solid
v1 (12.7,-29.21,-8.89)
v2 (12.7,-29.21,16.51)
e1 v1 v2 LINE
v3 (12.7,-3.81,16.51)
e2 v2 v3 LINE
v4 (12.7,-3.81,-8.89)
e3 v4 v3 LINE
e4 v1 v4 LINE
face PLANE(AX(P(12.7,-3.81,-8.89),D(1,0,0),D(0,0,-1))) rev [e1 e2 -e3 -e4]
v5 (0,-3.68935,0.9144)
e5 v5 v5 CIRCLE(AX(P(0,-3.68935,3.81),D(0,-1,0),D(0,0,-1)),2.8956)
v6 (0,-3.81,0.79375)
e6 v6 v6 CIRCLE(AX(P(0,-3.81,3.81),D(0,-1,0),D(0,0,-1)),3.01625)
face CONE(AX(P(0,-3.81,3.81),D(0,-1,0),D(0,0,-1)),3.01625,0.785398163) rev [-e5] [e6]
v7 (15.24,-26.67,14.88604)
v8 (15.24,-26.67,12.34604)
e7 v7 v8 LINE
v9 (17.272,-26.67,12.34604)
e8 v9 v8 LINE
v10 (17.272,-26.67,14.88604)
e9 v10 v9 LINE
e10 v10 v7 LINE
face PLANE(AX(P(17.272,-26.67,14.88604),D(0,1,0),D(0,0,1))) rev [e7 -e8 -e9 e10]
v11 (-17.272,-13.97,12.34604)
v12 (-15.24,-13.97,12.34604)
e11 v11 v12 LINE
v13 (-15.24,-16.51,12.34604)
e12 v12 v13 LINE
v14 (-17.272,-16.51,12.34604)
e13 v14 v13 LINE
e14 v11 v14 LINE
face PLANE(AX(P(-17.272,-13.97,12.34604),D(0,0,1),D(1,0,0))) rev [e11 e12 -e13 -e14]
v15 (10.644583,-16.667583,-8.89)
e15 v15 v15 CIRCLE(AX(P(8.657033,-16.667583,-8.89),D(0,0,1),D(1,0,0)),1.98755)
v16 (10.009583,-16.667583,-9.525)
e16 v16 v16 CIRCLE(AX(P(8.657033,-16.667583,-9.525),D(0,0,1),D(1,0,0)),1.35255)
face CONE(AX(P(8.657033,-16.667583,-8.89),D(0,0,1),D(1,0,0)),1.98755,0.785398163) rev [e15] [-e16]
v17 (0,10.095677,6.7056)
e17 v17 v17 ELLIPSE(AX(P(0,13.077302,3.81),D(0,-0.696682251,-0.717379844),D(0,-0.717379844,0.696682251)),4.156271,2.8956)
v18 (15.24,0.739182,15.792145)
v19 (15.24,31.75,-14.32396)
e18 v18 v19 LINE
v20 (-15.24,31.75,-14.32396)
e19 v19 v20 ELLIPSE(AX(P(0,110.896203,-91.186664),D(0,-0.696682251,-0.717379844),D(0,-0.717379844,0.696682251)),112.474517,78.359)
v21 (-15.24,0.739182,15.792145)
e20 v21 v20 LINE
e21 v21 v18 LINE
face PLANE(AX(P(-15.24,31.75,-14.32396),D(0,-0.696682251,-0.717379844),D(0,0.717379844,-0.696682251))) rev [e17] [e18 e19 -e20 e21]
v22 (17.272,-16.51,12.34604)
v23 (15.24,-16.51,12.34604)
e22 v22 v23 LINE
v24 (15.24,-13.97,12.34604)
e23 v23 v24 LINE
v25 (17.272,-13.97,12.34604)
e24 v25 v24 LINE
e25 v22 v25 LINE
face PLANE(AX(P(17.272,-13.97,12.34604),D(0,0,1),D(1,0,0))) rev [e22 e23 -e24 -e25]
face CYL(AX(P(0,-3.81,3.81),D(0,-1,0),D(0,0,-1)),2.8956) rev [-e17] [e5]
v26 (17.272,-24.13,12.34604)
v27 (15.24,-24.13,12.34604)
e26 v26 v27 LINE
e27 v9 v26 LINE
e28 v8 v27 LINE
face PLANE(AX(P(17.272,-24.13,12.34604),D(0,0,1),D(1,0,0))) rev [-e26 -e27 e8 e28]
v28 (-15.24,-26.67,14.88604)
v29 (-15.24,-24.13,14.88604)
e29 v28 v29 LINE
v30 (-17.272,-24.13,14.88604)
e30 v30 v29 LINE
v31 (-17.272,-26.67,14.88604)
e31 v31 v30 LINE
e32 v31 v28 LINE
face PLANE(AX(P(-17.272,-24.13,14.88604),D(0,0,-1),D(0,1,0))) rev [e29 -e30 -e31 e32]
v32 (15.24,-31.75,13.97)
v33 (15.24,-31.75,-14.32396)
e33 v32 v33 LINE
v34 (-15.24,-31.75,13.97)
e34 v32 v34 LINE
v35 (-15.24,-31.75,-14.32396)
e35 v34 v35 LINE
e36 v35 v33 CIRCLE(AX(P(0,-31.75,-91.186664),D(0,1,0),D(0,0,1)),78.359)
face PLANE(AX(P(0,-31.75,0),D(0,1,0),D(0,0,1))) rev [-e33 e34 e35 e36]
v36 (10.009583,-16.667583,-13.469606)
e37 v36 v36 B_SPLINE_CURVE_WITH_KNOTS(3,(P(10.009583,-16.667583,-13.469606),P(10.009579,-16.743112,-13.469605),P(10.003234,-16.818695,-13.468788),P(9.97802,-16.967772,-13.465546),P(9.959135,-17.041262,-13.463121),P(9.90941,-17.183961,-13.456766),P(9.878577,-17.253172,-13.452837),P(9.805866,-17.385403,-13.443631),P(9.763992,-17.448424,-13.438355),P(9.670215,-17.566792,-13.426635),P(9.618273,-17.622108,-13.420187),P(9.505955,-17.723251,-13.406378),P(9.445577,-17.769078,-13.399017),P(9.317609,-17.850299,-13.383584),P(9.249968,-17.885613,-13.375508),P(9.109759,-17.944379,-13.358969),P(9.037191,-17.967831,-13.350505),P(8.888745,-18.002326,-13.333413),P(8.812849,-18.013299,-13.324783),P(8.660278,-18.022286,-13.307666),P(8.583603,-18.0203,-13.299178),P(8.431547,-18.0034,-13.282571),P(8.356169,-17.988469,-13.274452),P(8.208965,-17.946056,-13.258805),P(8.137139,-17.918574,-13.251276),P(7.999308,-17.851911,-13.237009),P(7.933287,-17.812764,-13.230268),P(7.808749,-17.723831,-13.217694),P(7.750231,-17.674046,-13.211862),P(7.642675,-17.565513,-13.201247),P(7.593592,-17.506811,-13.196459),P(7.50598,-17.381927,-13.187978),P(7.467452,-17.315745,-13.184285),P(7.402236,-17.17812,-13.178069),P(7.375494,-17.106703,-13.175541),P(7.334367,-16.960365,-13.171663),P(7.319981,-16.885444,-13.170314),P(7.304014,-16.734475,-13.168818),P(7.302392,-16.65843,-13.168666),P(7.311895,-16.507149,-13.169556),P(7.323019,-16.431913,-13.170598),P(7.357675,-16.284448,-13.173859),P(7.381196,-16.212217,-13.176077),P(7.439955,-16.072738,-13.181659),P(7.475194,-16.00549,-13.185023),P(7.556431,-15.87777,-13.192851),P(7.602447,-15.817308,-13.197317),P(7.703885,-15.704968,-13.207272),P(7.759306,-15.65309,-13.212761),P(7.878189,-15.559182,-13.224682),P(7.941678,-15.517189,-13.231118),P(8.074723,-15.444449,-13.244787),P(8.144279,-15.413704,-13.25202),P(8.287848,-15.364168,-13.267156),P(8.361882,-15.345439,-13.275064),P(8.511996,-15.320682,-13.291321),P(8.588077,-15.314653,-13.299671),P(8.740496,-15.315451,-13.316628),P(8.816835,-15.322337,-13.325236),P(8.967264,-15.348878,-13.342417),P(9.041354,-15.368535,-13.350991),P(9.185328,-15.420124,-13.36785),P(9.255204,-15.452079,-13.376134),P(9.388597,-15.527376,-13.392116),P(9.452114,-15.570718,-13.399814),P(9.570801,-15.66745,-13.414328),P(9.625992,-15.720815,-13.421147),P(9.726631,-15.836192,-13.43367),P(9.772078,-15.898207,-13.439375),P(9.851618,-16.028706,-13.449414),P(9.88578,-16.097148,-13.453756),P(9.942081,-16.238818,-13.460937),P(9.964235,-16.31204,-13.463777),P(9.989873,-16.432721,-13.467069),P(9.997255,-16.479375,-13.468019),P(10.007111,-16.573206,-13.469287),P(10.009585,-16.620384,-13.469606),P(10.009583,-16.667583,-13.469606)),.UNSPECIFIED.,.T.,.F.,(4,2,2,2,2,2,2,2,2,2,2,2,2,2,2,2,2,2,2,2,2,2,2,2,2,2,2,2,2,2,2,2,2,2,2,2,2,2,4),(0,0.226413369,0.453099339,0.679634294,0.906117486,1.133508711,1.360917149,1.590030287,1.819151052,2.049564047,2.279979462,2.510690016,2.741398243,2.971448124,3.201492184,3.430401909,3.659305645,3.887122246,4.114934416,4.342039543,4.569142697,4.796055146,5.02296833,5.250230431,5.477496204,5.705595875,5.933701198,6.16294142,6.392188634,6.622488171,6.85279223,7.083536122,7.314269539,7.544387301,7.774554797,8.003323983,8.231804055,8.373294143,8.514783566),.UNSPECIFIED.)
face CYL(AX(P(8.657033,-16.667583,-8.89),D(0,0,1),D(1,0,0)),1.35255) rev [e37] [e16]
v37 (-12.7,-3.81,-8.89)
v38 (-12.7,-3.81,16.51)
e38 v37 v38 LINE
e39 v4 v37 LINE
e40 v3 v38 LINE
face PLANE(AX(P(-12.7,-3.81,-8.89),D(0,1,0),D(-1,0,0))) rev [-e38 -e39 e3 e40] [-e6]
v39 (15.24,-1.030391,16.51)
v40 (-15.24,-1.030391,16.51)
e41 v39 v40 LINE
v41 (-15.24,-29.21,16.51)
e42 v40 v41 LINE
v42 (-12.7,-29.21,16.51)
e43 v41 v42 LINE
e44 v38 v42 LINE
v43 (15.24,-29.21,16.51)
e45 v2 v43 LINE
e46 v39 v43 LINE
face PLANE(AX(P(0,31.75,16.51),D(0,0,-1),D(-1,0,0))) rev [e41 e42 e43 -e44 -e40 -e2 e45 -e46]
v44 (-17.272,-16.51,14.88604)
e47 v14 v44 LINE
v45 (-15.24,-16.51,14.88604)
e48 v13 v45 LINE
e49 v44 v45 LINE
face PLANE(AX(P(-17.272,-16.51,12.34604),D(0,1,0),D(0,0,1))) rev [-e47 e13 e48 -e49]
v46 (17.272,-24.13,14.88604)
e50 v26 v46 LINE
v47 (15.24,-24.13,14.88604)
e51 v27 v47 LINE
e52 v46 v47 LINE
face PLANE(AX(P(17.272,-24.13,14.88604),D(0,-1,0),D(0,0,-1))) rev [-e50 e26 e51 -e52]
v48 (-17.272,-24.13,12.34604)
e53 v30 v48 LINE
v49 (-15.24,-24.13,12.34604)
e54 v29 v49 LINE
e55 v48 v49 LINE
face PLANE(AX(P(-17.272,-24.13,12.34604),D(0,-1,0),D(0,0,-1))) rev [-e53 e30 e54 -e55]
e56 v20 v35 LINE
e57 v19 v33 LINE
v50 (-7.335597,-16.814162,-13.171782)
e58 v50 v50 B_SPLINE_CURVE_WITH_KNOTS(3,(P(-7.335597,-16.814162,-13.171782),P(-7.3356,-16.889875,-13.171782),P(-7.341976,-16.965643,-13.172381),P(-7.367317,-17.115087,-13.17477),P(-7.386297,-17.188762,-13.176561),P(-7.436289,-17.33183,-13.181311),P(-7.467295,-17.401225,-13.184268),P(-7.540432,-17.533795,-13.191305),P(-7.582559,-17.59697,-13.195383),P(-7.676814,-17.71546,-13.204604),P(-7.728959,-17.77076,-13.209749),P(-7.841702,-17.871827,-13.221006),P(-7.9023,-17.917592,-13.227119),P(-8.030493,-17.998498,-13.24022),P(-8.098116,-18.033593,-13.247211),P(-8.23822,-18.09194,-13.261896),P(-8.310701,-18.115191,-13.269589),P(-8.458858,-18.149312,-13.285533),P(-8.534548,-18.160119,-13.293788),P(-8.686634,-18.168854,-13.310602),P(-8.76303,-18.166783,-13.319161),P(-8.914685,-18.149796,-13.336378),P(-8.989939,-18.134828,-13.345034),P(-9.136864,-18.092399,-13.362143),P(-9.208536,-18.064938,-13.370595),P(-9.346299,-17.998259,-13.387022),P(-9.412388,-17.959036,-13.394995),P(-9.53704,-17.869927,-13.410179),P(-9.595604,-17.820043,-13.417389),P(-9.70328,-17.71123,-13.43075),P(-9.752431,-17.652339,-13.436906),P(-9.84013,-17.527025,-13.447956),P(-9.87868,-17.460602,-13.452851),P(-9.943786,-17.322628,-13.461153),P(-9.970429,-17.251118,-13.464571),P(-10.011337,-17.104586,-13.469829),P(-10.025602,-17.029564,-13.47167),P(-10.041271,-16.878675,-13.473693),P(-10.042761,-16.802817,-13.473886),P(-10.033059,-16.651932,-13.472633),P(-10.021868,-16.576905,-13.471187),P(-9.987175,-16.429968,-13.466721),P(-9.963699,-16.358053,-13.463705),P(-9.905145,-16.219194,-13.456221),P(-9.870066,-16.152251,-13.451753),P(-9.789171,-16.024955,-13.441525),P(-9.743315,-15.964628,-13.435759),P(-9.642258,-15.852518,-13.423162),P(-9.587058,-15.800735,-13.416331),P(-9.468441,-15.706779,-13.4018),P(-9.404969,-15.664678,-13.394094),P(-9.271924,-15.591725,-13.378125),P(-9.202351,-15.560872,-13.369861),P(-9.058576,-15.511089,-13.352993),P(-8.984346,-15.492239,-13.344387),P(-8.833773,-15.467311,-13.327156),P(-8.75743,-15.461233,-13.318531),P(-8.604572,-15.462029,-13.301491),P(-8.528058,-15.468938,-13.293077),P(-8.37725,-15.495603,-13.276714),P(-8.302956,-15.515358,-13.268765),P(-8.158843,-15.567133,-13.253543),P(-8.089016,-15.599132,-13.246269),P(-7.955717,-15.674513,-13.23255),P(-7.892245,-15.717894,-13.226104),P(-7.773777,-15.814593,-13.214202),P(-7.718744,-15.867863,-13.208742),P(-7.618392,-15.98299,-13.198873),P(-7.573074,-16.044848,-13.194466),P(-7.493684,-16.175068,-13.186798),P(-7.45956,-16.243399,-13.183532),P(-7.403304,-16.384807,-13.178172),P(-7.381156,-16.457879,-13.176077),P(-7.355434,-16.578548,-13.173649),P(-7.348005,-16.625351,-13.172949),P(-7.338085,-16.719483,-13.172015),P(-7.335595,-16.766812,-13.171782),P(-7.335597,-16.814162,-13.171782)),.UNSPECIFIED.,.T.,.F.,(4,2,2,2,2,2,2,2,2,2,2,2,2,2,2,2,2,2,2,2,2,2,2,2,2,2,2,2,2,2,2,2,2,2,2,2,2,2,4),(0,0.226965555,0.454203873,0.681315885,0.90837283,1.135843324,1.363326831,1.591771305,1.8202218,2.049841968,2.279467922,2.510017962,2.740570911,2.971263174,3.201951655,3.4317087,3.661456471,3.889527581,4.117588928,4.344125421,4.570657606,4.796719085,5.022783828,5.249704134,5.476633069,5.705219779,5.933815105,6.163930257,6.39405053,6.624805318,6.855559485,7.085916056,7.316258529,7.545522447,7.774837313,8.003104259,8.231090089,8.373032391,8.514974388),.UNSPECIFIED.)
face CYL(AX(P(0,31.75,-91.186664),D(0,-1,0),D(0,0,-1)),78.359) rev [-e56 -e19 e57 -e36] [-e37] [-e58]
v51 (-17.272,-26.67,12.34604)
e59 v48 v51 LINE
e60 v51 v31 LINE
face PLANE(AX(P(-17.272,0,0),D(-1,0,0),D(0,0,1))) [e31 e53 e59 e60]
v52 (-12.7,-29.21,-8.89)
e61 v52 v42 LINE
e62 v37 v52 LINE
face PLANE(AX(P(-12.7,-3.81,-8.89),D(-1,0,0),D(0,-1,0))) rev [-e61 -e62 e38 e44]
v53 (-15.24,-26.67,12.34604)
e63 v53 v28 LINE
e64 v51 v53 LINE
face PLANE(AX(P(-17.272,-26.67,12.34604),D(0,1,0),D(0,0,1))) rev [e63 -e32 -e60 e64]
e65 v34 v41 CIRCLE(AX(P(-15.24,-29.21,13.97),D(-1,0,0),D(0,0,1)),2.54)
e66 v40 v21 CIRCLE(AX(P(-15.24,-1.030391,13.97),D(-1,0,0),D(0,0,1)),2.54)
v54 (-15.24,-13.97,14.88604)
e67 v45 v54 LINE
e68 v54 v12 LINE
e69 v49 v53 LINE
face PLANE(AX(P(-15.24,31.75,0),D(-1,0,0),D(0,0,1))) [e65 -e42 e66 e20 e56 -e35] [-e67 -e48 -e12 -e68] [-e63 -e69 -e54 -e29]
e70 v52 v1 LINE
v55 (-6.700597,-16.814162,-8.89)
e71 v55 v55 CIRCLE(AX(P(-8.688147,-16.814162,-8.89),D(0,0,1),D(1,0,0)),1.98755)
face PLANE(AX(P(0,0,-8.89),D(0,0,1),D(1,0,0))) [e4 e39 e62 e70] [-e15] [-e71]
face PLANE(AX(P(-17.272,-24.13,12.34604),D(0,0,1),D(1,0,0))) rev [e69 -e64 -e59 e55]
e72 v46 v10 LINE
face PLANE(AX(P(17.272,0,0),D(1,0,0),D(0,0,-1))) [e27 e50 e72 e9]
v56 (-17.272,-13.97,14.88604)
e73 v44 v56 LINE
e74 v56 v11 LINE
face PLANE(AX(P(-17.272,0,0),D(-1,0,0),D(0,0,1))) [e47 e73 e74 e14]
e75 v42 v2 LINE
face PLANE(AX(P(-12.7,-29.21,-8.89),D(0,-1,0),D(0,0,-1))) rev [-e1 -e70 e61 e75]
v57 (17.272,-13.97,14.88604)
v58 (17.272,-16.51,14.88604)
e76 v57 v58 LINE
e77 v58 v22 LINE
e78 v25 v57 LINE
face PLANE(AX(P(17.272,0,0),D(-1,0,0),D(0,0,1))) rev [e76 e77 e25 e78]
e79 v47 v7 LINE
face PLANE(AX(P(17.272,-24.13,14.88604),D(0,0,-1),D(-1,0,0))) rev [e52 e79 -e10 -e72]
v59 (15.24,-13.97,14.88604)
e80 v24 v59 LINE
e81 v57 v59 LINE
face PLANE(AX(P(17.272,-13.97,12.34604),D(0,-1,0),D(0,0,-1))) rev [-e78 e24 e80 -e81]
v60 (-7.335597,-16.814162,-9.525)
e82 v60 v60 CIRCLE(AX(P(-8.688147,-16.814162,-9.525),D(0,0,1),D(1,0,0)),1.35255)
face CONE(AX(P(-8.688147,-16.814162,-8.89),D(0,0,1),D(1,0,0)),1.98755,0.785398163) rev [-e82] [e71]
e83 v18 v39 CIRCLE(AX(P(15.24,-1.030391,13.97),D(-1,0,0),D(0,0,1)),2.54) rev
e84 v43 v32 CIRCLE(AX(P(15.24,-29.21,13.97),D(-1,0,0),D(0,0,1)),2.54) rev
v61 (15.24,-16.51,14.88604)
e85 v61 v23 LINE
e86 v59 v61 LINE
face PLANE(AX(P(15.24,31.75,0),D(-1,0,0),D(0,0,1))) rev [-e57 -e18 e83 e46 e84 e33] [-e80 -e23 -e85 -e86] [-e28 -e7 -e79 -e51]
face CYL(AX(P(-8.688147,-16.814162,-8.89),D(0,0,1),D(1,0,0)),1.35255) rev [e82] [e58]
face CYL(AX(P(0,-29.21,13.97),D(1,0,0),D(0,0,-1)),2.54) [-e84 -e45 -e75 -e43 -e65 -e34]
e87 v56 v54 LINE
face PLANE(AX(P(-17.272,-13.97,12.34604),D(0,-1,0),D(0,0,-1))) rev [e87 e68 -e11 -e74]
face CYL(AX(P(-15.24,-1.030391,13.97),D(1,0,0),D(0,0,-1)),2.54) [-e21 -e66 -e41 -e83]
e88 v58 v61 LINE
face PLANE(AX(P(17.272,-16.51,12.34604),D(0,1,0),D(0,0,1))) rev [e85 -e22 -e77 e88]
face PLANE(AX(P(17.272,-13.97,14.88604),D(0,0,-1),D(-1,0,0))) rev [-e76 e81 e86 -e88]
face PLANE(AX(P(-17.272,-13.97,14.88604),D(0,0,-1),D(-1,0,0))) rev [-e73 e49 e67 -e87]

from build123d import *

# Parameters (mm, degrees)
BOSS_EXTRUDE1_DEPTH                 = 31.75
SKETCH3_W                           = 25.4
SKETCH3_H                           = 25.4
CUT_EXTRUDE1_DEPTH                  = 25.4
CUT_EXTRUDE2_DEPTH                  = 30.48
SKETCH5_W                           = 2.54
SKETCH5_H                           = 2.54
BOSS_EXTRUDE2_DEPTH                 = 2.032
SKETCH7_W                           = 2.54
SKETCH7_H                           = 2.54
BOSS_EXTRUDE3_DEPTH                 = 2.032
FILLET1_R                           = 2.54
FILLET2_R                           = 2.54
TAP_DRILL_FOR_6_32_TAP1_D           = 2.7051
TAP_DRILL_FOR_6_32_TAP1_CSINK_D     = 3.9751
TAP_DRILL_FOR_6_32_TAP1_CSINK_ANGLE = 90
TAP_DRILL_FOR_6_32_TAP2_D           = 2.7051
TAP_DRILL_FOR_6_32_TAP2_CSINK_D     = 3.9751
TAP_DRILL_FOR_6_32_TAP2_CSINK_ANGLE = 90


with BuildPart() as part:
    # Sketch1 → Boss-Extrude1 (new, symmetric)
    with BuildSketch(Plane(origin=(0, 0, 0), x_dir=(1, 0, 0), z_dir=(0, 1, 0))):
        with BuildLine():
            Line((-4.43094419, 12.953042159), (-15.24, 12.953042159))
            Line((-15.24, 12.953042159), (-15.24, -16.51))
            Line((-15.24, -16.51), (15.24, -16.51))
            Line((15.24, -16.51), (15.24, 12.953042159))
            Line((15.24, 12.953042159), (4.43094419, 12.953042159))
            ThreePointArc((4.43094419, 12.953042159), (0, 12.82766418), (-4.43094419, 12.953042159))
        make_face()
        with BuildLine():
            Line((-15.24, 14.323960084), (-15.24, 12.953042159))
            Line((-15.24, 12.953042159), (-4.43094419, 12.953042159))
            ThreePointArc((-4.43094419, 12.953042159), (-9.859328847, 13.450401628), (-15.24, 14.323960084))
        make_face()
        with BuildLine():
            ThreePointArc((15.24, 14.323960084), (9.859328847, 13.450401628), (4.43094419, 12.953042159))
            Line((4.43094419, 12.953042159), (15.24, 12.953042159))
            Line((15.24, 12.953042159), (15.24, 14.323960084))
        make_face()
    extrude(amount=BOSS_EXTRUDE1_DEPTH, both=True)

    # Sketch3 → Cut-Extrude1 (cut)
    with BuildSketch(Plane.XY.offset(16.51)):
        with Locations((0, -16.51)):
            Rectangle(SKETCH3_W, SKETCH3_H)
    extrude(amount=-CUT_EXTRUDE1_DEPTH, mode=Mode.SUBTRACT)

    # Sketch4 → Cut-Extrude2 (cut)
    with BuildSketch(Plane(origin=(15.24, 0, 0), x_dir=(0, 0, -1), z_dir=(1, 0, 0))):
        Polygon((-16.51, 31.75), (14.323960084, 31.75), (-16.51, 0), align=None)
    extrude(amount=-CUT_EXTRUDE2_DEPTH, mode=Mode.SUBTRACT)

    # Sketch5 → Boss-Extrude2 (add)
    with BuildSketch(Plane(origin=(15.24, 0, 0), x_dir=(0, 0, -1), z_dir=(1, 0, 0))):
        with Locations((-13.616039916, -25.4)):
            Rectangle(SKETCH5_W, SKETCH5_H)
        with Locations((-13.616039916, -15.24)):
            Rectangle(SKETCH5_W, SKETCH5_H)
    extrude(amount=BOSS_EXTRUDE2_DEPTH)

    # Sketch7 → Boss-Extrude3 (add)
    with BuildSketch(Plane.ZY.offset(15.24)):
        with Locations((13.616039916, -25.4)):
            Rectangle(SKETCH7_W, SKETCH7_H)
        with Locations((13.616039916, -15.24)):
            Rectangle(SKETCH7_W, SKETCH7_H)
    extrude(amount=BOSS_EXTRUDE3_DEPTH)

    # Sketch21 → #1 (0.228) Diameter Hole3 (revolve, cut)
    with BuildSketch(Plane(origin=(0, -3.81, 3.81), x_dir=(0, 0, -1), z_dir=(1, 0, 0))):
        Polygon((0, 0), (0, 35.56), (2.8956, 35.56), (2.8956, 0.12065), (3.01625, 0), align=None)
    revolve(axis=Axis((0, -10.16, 3.81), (0, 1, 0)), mode=Mode.SUBTRACT)

    # Fillet1
    fillet1_edges = [part.edges().sort_by_distance(p)[0] for p in [
        (0, 0, 16.51),
    ]]
    fillet(fillet1_edges, radius=FILLET1_R)

    # Fillet2
    fillet2_edges = [part.edges().sort_by_distance(p)[0] for p in [
        (0, -31.75, 16.51),
    ]]
    fillet(fillet2_edges, radius=FILLET2_R - 0.0001)  # a hair under: the kernel refuses the full size

    # Tap Drill for #6-32 Tap1 (through all)
    with Locations(Plane.XY.offset(-8.89)):
        with Locations((-8.688147052, -16.814161917)):
            CounterSinkHole(TAP_DRILL_FOR_6_32_TAP1_D / 2, TAP_DRILL_FOR_6_32_TAP1_CSINK_D / 2, counter_sink_angle=TAP_DRILL_FOR_6_32_TAP1_CSINK_ANGLE)

    # Tap Drill for #6-32 Tap2 (through all)
    with Locations(Plane.XY.offset(-8.89)):
        with Locations((8.657032922, -16.667582931)):
            CounterSinkHole(TAP_DRILL_FOR_6_32_TAP2_D / 2, TAP_DRILL_FOR_6_32_TAP2_CSINK_D / 2, counter_sink_angle=TAP_DRILL_FOR_6_32_TAP2_CSINK_ANGLE)


solid = part.part
